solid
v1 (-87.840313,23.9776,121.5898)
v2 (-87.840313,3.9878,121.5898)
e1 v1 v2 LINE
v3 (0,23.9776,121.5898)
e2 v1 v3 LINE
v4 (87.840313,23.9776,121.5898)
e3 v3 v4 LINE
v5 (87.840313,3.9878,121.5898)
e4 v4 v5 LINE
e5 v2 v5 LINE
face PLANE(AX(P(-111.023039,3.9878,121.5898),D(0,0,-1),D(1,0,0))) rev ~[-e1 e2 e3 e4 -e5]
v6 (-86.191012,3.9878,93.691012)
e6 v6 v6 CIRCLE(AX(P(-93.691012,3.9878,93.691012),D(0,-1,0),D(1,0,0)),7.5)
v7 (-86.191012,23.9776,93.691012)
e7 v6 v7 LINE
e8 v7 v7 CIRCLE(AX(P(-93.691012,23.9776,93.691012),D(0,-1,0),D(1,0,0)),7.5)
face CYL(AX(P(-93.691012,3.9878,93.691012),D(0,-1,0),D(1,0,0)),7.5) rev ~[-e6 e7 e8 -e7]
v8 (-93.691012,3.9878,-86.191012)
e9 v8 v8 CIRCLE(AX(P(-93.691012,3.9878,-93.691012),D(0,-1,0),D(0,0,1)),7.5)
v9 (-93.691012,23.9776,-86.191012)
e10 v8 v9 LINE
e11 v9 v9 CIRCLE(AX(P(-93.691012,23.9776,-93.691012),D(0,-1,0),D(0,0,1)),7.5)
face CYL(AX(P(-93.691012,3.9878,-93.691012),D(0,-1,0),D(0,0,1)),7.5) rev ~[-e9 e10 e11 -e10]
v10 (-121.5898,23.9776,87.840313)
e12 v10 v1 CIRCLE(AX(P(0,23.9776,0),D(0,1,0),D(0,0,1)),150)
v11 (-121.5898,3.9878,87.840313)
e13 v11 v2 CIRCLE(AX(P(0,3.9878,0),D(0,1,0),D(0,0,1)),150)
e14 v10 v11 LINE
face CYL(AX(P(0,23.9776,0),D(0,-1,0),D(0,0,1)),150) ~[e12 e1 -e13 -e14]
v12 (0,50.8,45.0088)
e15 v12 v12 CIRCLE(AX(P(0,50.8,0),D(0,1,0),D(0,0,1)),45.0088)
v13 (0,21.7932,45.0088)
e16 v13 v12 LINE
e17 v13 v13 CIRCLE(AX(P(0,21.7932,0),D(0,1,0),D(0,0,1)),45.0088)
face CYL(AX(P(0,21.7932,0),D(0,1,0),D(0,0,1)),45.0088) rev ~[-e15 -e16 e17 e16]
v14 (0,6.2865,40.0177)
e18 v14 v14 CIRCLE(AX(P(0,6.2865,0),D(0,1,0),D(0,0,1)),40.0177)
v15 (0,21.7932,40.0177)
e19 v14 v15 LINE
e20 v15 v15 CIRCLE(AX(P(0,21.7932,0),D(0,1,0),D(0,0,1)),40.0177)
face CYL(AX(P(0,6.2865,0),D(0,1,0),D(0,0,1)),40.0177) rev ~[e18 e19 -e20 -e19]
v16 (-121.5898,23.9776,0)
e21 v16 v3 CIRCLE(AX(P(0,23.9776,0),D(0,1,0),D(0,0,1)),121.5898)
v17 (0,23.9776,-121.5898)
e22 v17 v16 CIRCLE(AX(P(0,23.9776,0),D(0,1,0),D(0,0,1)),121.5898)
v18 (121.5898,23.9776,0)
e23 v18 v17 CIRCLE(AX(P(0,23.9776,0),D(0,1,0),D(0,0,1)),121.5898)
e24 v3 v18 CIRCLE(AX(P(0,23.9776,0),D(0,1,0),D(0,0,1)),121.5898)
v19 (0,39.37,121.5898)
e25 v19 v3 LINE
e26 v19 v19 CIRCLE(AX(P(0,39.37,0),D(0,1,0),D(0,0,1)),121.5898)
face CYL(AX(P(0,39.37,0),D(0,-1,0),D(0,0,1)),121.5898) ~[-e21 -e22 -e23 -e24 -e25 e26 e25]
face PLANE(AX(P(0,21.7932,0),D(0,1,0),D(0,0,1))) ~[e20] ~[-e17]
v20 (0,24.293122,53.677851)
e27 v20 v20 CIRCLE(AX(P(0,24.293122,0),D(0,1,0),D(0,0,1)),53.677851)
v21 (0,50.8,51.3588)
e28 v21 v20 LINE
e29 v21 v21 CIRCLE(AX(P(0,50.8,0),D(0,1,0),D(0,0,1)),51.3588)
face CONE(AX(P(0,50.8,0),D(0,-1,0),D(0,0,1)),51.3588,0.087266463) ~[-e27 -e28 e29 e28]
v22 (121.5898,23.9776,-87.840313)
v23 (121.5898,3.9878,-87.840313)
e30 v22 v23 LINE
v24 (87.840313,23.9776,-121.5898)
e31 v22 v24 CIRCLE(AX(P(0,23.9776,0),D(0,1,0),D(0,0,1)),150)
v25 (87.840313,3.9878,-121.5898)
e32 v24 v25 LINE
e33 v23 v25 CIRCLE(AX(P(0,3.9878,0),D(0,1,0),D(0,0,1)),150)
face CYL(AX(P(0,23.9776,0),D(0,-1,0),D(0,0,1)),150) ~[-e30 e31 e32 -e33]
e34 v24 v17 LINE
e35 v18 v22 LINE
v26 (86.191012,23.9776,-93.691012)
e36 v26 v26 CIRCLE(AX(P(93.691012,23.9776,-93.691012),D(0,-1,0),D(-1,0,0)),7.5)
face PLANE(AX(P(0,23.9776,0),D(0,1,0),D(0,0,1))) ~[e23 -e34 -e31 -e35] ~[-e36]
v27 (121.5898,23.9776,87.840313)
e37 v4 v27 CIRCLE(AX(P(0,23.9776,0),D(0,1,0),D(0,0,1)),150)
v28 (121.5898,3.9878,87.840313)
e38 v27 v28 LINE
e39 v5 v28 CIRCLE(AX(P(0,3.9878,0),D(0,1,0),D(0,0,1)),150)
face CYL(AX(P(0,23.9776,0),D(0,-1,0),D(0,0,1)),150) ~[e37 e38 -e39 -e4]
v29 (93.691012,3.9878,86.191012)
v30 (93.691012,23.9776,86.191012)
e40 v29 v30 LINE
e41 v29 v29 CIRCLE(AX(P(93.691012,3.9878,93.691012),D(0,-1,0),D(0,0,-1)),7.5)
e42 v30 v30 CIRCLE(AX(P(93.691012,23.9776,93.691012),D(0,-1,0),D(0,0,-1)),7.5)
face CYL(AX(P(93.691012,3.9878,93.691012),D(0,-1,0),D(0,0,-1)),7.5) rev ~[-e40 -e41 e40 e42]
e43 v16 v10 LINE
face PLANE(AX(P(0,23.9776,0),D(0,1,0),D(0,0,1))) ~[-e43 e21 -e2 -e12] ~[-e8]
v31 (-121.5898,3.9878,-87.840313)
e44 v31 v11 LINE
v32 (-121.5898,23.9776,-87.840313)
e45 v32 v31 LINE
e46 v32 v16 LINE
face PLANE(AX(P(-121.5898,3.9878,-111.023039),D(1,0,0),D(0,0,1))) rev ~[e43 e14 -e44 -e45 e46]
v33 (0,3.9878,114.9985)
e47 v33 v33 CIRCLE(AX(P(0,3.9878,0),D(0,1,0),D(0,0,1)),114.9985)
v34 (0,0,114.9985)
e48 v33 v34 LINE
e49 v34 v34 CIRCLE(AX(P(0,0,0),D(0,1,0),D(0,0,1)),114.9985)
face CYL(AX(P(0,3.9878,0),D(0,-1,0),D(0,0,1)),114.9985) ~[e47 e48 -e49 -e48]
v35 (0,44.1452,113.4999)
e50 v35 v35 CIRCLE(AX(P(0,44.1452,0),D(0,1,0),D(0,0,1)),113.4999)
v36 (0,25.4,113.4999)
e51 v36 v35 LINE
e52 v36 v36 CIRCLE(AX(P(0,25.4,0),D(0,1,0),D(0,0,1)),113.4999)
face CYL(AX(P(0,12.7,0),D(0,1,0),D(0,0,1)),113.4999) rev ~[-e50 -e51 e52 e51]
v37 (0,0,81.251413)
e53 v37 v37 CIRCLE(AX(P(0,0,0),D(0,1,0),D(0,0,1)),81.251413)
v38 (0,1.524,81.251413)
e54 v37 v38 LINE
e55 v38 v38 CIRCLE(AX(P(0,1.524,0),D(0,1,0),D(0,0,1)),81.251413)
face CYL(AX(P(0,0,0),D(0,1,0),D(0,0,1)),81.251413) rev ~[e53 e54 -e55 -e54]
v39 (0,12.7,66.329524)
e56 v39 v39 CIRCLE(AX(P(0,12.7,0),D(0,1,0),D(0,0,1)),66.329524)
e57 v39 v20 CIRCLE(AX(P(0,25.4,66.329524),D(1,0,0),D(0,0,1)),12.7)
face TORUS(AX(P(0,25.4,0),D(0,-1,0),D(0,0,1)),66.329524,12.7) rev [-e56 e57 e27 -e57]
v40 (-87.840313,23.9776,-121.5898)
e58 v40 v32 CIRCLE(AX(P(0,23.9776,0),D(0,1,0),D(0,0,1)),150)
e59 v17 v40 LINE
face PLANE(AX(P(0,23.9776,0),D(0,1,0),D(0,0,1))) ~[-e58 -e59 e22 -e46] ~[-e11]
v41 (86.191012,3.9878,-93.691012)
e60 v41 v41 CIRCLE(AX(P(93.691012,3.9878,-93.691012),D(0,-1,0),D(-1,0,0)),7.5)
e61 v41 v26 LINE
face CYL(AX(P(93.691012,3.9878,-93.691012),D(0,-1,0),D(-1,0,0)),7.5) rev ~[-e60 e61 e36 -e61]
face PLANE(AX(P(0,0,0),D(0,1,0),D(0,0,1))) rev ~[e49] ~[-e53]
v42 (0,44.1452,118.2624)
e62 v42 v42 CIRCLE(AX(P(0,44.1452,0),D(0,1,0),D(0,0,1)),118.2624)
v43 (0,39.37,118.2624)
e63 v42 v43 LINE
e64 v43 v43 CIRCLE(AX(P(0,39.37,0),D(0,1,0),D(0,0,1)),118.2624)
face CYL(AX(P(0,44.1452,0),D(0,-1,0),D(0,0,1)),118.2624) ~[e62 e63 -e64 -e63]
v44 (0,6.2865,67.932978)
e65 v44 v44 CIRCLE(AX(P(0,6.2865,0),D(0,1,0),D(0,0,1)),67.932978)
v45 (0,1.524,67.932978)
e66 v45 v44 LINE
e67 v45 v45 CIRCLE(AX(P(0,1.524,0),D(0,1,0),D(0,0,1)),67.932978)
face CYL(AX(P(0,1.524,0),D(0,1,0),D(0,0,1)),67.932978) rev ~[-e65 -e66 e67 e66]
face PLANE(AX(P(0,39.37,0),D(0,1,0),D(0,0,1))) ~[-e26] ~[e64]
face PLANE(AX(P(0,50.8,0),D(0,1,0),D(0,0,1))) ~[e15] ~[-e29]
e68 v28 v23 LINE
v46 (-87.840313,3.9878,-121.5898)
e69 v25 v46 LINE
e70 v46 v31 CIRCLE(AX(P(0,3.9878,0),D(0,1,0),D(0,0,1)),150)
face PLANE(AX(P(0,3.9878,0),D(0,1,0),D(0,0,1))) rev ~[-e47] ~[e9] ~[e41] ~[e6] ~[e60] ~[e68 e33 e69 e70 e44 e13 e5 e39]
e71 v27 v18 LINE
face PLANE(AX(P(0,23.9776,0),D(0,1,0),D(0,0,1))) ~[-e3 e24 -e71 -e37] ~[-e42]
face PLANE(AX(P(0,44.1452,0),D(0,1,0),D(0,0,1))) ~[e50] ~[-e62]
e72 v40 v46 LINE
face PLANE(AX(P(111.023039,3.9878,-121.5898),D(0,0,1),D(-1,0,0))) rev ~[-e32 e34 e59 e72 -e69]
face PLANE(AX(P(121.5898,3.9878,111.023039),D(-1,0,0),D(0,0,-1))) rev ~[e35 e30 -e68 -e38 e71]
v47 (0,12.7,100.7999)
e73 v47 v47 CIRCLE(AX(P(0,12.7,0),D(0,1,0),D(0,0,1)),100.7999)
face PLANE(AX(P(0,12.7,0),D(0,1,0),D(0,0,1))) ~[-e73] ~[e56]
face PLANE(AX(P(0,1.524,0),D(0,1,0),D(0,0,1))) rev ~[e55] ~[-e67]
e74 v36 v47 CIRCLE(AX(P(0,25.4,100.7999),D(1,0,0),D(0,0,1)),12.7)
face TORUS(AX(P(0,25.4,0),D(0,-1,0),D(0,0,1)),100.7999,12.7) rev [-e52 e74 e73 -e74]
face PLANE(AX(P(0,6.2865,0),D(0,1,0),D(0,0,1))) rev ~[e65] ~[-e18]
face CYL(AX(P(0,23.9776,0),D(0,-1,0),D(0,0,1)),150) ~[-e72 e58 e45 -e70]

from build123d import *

# Parameters (mm, degrees)
F2_R            = 7.5
F3_DEPTH        = 25.4
F3_COPIES_COUNT = 4
F4_R            = 12.7


# Not quite as in the source:
# - a pattern or mirror of a feature is missing from the dataset's text; its kind, count and spacing are read off the source's solid


with BuildPart() as f1:
    # F0 (on Right) → F1 (revolve)
    with BuildSketch(Plane.YZ):
        Polygon((23.9776, 150), (3.9878, 150), (3.9878, 114.9985), (0, 114.9985), (0, 81.2514126301), (1.524, 81.2514126301), (1.524, 67.9329782724), (6.2865, 67.9329782724), (6.2865, 40.0177), (21.7932, 40.0177), (21.7932, 45.0088), (50.8, 45.0088), (50.8, 51.3588), (12.7, 54.6921180803), (12.7, 113.4999), (44.1452, 113.4999), (44.1452, 118.2624), (39.37, 118.2624), (39.37, 121.5898), (23.9776, 121.5898), align=None)
    revolve(axis=Axis((0, 63.4710703942, 0), (0, 1, 0)))

    # F2 (on face) → F3 (cut)
    with BuildSketch(Plane.XZ.offset(-3.9878)):
        with Locations((-93.6910121111, 93.6910121111)):
            Circle(F2_R)
        with BuildLine():
            Line((-111.0230386257, 169.054677367), (-111.0230386257, 121.5898))
            Line((-111.0230386257, 121.5898), (-87.8403127041, 121.5898))
            ThreePointArc((-87.8403127041, 121.5898), (0, 150), (87.8403127041, 121.5898))
            Line((87.8403127041, 121.5898), (147.7070748806, 121.5898))
            Line((147.7070748806, 121.5898), (147.7070748806, 169.054677367))
            Line((147.7070748806, 169.054677367), (-111.0230386257, 169.054677367))
        make_face()
        with BuildLine():
            ThreePointArc((87.8403127041, 121.5898), (0, 150), (-87.8403127041, 121.5898))
            Line((-87.8403127041, 121.5898), (87.8403127041, 121.5898))
        make_face()
    f3 = extrude(amount=-F3_DEPTH, mode=Mode.SUBTRACT)

    # F3_copies: F3 ×4 about axis
    f3_copies_axis = Axis((0, 0, 0), (0, 1, 0))
    for i in range(1, F3_COPIES_COUNT):
        add(f3.rotate(f3_copies_axis, i * 360 / F3_COPIES_COUNT), mode=Mode.SUBTRACT)

    # F4
    f4_edges = [f1.edges().sort_by_distance(p)[0] for p in [
        (0, 12.7, -113.4999),
        (0, 12.7, -54.692118),
    ]]
    fillet(f4_edges, radius=F4_R)


solid = f1.part
